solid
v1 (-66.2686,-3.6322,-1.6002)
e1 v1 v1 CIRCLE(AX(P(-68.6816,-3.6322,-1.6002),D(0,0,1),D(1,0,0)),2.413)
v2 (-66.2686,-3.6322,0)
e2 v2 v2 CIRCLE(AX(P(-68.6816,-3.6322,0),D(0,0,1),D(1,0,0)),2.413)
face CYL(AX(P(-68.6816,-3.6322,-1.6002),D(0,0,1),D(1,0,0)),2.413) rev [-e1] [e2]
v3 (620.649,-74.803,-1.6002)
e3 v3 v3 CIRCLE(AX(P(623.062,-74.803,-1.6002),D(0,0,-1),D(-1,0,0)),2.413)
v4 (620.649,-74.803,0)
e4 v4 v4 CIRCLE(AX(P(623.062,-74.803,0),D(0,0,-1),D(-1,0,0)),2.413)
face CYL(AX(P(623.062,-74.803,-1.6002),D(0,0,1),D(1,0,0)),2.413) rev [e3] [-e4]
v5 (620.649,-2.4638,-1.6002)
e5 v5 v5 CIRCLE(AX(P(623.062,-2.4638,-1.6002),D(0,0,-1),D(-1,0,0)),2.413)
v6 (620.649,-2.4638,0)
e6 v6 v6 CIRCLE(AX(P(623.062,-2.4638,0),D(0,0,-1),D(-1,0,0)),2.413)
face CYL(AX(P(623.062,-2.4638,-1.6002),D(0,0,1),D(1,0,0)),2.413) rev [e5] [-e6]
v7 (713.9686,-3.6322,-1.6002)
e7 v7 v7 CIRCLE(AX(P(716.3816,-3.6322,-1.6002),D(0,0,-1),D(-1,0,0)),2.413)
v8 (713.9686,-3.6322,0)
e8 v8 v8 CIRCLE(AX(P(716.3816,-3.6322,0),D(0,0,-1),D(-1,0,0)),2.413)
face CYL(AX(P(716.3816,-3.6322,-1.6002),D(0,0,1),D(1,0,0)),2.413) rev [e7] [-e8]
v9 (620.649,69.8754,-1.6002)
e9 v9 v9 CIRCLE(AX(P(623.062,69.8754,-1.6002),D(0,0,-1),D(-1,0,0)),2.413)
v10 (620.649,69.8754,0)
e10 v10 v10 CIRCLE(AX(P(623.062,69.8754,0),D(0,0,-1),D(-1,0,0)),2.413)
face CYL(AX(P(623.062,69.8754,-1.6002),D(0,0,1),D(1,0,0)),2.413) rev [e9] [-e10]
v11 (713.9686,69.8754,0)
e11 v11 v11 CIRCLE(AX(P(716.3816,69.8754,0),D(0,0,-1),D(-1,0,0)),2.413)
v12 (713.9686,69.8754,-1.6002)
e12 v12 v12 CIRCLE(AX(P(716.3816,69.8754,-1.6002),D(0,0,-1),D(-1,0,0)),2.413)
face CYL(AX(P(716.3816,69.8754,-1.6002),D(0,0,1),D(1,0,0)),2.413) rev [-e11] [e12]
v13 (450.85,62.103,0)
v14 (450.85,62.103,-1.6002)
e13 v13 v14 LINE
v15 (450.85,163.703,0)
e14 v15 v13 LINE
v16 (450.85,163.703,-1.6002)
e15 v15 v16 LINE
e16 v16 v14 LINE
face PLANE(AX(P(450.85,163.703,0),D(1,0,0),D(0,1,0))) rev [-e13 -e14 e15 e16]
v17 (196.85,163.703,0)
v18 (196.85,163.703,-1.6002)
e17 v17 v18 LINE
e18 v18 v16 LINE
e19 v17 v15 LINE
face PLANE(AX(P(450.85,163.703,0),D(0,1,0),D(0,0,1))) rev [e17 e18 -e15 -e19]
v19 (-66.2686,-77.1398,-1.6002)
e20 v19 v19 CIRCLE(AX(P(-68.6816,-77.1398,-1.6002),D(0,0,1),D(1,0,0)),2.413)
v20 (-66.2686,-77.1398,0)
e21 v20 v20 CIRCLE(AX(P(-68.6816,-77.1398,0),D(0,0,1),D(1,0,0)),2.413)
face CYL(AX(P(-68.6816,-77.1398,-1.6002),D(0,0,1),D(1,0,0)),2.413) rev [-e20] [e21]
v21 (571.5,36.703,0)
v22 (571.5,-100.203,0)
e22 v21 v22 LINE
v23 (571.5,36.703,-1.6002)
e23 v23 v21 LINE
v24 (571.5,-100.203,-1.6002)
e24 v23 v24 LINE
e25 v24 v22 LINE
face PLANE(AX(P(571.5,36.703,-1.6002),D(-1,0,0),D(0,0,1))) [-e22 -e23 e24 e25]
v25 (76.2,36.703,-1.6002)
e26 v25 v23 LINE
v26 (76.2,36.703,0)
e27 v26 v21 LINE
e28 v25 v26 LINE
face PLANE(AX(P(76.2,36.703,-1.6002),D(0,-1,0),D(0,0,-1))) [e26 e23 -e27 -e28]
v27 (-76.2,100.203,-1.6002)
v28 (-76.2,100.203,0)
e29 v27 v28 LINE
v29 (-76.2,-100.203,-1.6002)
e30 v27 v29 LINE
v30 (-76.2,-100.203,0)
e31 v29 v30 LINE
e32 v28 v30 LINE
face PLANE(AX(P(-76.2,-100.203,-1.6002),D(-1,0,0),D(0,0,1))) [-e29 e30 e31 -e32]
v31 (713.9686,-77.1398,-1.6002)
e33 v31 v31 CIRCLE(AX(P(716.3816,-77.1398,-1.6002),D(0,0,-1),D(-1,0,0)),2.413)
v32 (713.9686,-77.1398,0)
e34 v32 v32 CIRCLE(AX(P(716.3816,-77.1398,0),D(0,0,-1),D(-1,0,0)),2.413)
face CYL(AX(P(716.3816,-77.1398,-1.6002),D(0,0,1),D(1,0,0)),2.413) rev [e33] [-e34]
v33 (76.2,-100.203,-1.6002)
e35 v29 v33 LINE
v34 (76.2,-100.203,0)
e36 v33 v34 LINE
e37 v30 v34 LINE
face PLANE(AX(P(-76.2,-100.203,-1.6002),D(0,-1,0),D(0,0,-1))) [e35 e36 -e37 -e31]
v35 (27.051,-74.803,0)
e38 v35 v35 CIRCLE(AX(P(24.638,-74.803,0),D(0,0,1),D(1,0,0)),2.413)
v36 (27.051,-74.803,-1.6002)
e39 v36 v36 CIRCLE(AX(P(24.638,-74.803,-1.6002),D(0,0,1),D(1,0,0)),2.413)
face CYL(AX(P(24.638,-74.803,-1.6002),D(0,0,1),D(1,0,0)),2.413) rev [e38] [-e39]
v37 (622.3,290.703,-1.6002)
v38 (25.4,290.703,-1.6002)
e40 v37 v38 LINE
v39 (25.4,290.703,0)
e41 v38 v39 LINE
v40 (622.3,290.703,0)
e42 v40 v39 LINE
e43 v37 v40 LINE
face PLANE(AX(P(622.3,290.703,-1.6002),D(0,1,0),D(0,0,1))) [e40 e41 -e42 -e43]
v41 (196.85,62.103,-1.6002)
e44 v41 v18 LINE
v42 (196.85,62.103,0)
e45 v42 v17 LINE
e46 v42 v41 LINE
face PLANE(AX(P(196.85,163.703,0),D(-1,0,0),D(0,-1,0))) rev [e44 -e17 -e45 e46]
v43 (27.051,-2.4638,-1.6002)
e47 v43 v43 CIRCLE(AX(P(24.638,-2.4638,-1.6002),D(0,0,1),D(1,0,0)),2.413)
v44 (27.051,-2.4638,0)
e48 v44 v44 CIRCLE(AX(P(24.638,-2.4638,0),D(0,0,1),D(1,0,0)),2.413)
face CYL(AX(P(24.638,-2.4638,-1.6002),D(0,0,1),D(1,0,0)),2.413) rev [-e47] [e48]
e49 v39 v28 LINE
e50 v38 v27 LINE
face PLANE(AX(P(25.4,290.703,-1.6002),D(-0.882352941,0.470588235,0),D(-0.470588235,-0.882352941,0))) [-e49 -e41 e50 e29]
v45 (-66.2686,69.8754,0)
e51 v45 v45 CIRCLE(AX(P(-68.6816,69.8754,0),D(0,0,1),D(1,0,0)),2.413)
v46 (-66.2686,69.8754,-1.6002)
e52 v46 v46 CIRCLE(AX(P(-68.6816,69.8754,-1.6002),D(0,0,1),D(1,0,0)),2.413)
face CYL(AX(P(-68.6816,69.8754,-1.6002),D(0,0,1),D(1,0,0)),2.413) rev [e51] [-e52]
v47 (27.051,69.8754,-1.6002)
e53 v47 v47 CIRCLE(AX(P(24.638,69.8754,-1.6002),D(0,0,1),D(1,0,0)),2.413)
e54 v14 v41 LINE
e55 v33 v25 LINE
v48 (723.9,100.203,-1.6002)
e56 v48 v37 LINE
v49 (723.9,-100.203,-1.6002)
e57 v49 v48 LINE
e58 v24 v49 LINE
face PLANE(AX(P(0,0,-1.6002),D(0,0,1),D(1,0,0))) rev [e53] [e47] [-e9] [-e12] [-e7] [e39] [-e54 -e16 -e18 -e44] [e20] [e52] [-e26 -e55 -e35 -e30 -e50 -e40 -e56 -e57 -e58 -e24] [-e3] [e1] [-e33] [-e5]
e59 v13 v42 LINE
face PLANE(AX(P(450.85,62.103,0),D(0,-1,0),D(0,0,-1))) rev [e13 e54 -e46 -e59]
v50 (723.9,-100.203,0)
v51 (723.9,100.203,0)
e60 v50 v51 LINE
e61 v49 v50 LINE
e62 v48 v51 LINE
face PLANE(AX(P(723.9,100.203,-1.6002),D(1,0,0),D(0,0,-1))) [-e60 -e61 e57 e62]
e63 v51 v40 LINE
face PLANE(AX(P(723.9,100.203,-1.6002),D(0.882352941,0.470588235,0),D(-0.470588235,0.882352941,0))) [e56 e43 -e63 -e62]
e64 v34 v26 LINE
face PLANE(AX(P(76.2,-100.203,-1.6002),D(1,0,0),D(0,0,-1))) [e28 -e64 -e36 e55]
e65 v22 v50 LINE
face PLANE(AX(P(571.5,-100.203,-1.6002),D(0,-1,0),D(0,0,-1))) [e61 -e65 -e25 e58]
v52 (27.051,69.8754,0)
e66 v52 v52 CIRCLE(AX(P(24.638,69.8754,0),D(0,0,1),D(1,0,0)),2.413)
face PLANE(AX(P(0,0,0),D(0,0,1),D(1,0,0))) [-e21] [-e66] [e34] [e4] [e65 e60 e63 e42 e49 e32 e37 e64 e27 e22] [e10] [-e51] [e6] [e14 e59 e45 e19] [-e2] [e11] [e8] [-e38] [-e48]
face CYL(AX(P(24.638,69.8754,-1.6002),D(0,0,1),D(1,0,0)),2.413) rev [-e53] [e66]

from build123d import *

# Parameters (mm, degrees)
BASE_FLANGE1_DEPTH = 1.6002
SKETCH2_R          = 2.413
CUT_EXTRUDE1_DEPTH = 781.091023438
SKETCH3_W          = 254
SKETCH3_H          = 101.6
CUT_EXTRUDE2_DEPTH = 781.091023438


# Sheet-metal steps are written as plain solids
with BuildPart() as part:
    # Sketch1 → Base-Flange1 (new body)
    with BuildSketch(Plane.XY):
        Polygon((-76.2, -100.203), (76.2, -100.203), (76.2, 36.703), (571.5, 36.703), (571.5, -100.203), (723.9, -100.203), (723.9, 100.203), (622.3, 290.703), (25.4, 290.703), (-76.2, 100.203), align=None)
    extrude(amount=-BASE_FLANGE1_DEPTH)

    # Sketch2 → Cut-Extrude1 (cut, through all)
    with BuildSketch(Plane.XY):
        with Locations((24.637999896, 69.8754)):
            Circle(SKETCH2_R)
        with Locations((-68.6816, 69.8754)):
            Circle(SKETCH2_R)
        with Locations((24.637999896, -2.4638)):
            Circle(SKETCH2_R)
        with Locations((-68.6816, -3.6322)):
            Circle(SKETCH2_R)
        with Locations((-68.6816, -77.1398)):
            Circle(SKETCH2_R)
        with Locations((24.637999896, -74.803)):
            Circle(SKETCH2_R)
    cut_extrude1 = extrude(amount=-CUT_EXTRUDE1_DEPTH, mode=Mode.SUBTRACT)

    # Mirror1: Cut-Extrude1 across plane
    add(cut_extrude1.mirror(Plane.ZY.offset(-323.85)), mode=Mode.SUBTRACT)

    # Sketch3 → Cut-Extrude2 (cut, through all)
    with BuildSketch(Plane(origin=(0, 0, -1.6002), x_dir=(-1, 0, 0), z_dir=(0, 0, -1))):
        with Locations((-323.85, 112.903)):
            Rectangle(SKETCH3_W, SKETCH3_H)
    extrude(amount=-CUT_EXTRUDE2_DEPTH, mode=Mode.SUBTRACT)


solid = part.part
